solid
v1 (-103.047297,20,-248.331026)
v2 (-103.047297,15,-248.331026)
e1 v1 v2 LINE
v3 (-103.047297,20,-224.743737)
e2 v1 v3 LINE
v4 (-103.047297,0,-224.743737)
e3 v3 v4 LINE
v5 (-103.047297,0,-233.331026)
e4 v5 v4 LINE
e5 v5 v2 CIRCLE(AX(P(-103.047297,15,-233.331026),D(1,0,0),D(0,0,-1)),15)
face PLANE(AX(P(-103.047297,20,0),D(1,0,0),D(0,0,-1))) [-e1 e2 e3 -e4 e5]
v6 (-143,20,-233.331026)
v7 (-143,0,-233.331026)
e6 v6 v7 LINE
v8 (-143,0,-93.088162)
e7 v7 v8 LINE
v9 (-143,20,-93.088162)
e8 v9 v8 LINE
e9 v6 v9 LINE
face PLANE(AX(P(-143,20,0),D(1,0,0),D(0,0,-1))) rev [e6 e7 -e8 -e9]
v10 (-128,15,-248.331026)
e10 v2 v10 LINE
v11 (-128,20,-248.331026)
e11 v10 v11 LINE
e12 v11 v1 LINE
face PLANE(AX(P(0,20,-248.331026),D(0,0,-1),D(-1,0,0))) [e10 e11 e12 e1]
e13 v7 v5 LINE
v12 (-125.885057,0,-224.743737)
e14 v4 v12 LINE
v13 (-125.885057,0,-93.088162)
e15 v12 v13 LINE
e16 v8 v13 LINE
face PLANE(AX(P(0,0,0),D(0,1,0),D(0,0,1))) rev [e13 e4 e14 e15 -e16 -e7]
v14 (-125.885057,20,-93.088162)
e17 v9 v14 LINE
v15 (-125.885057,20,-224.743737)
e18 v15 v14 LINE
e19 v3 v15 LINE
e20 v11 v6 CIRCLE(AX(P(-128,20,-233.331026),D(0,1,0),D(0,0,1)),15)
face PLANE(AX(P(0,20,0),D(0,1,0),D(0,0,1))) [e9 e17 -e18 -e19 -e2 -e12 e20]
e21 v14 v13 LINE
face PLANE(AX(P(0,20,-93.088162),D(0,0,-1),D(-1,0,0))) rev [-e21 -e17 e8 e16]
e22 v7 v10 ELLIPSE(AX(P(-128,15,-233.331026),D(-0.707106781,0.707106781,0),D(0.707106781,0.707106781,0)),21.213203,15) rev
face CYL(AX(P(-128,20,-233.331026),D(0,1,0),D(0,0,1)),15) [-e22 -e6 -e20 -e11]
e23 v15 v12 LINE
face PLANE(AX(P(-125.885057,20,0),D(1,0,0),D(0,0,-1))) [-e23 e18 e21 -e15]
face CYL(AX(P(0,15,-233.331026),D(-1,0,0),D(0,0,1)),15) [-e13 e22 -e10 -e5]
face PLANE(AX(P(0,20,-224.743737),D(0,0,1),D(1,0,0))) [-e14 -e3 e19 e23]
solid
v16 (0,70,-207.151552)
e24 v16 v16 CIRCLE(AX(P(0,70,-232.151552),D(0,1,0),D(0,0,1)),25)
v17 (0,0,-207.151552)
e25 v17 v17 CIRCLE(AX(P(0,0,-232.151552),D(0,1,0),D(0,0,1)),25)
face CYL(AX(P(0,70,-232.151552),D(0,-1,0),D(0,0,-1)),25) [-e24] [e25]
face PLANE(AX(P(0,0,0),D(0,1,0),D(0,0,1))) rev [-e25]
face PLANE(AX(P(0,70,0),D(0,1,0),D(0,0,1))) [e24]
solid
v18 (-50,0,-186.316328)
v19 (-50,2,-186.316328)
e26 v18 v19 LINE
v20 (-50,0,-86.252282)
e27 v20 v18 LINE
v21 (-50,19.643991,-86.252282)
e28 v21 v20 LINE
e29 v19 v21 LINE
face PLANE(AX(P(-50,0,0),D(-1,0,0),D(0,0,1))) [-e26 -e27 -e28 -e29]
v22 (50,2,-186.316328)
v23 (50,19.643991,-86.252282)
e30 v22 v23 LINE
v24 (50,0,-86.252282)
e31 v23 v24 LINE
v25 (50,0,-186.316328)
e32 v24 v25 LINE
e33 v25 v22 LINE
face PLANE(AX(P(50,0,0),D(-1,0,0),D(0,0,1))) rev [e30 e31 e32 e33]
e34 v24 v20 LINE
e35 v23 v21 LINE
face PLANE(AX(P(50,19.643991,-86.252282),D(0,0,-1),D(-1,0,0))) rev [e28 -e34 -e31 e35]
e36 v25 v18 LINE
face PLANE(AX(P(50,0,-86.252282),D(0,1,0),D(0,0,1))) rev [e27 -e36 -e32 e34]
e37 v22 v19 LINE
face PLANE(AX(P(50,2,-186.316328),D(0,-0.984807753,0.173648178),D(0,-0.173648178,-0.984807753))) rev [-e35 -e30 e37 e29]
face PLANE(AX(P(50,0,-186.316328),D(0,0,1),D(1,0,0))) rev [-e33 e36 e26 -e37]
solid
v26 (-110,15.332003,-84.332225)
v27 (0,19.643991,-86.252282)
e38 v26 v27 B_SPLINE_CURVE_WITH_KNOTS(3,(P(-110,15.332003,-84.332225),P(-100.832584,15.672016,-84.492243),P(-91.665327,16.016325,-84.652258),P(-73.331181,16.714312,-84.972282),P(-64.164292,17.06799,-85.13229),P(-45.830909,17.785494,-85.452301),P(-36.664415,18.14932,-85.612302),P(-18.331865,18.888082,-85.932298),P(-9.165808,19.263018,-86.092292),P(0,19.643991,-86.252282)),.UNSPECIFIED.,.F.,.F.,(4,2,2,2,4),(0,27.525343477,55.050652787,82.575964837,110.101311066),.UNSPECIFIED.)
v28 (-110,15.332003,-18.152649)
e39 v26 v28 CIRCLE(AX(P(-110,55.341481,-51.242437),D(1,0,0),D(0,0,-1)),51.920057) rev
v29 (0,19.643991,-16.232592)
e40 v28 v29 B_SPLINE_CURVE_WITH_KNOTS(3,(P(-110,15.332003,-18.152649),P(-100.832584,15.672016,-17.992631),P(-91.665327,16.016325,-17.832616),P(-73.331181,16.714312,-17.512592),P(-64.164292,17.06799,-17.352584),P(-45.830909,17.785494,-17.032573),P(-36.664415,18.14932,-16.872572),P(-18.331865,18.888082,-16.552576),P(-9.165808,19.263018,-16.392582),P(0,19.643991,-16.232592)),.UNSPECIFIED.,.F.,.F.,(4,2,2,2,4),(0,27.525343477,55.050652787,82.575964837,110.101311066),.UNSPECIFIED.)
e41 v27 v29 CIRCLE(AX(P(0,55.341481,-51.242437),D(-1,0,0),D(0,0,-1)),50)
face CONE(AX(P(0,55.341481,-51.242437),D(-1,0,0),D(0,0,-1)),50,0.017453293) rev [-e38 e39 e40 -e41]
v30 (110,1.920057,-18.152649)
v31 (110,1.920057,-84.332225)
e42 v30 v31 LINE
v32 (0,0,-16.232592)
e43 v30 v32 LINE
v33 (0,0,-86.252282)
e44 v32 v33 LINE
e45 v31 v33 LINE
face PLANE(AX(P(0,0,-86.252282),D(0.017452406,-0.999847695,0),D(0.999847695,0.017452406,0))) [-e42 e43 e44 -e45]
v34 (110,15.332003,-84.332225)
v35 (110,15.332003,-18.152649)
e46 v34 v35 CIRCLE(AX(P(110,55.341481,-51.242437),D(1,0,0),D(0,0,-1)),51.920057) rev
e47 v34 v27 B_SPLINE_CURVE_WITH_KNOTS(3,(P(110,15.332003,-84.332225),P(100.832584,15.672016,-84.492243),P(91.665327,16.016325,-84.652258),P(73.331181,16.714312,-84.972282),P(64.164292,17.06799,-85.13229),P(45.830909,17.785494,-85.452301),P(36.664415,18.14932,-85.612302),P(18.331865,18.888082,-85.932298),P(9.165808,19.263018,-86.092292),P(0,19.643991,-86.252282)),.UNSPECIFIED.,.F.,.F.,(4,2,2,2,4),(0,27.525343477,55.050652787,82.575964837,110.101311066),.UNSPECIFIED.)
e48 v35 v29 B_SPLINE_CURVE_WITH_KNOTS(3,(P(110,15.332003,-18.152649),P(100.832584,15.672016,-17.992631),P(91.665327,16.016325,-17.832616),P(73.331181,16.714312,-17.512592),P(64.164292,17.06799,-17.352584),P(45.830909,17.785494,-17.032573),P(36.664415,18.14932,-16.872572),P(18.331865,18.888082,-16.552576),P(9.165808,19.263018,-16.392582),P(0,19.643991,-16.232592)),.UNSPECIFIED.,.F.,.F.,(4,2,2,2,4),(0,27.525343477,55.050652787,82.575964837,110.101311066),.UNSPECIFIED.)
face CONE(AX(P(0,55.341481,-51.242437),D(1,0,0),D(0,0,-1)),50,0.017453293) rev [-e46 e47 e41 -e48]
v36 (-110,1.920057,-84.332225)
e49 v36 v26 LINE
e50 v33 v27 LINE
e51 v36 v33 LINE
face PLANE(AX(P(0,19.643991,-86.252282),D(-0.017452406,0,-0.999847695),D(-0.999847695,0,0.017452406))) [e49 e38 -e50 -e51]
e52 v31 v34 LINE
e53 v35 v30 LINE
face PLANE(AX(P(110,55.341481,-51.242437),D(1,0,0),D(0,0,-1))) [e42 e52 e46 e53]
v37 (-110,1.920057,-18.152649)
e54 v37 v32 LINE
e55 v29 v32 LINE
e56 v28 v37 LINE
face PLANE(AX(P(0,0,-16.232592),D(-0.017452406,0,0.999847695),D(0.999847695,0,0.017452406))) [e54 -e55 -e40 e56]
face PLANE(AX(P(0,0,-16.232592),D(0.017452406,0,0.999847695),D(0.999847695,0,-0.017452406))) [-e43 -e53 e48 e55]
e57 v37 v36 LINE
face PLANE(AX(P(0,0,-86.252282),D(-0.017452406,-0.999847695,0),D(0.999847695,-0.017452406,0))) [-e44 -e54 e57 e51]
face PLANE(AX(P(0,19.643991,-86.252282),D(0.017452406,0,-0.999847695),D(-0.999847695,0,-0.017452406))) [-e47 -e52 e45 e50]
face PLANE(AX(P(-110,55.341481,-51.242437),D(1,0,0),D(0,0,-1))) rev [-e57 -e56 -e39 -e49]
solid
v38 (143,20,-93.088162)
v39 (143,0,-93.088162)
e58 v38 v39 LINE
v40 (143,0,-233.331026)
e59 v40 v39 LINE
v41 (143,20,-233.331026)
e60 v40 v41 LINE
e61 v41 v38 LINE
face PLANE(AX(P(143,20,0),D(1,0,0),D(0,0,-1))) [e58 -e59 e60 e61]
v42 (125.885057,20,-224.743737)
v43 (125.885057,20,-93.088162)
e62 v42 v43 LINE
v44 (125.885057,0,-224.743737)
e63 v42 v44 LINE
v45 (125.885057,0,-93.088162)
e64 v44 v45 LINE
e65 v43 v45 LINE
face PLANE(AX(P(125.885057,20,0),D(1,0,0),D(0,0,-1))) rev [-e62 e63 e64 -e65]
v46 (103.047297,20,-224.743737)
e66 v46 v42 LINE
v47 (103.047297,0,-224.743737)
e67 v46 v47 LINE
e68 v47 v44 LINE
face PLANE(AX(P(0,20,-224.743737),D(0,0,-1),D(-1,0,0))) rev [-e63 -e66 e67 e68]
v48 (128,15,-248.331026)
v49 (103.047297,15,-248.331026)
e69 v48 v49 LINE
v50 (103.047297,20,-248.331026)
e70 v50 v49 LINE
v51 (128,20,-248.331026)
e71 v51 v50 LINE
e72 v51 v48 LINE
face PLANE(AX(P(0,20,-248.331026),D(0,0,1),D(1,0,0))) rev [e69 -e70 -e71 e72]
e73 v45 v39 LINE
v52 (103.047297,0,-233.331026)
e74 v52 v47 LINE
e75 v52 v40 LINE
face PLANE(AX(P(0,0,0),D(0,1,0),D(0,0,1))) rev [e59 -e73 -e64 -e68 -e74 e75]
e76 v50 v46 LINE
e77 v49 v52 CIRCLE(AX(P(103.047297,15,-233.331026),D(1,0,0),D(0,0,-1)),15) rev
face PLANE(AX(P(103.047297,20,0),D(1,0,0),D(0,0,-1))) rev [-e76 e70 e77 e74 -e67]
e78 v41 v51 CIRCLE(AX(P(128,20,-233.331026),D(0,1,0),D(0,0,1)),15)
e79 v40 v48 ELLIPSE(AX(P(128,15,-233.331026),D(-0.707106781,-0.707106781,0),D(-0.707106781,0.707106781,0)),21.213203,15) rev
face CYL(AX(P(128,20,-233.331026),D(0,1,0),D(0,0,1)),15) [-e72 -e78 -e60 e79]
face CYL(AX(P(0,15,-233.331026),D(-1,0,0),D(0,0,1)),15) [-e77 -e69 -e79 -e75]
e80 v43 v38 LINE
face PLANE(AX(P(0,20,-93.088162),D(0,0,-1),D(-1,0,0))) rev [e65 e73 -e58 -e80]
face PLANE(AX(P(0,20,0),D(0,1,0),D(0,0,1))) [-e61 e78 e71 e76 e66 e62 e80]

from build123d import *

# Parameters (mm, degrees)
BOSS_EXTRUDE1_DEPTH           = 20
BOSS_EXTRUDE1_2_DEPTH         = 20
FILLET1_R                     = 15
FILLET2_R                     = 15
BOSS_EXTRUDE2_DEPTH           = 50
SKETCH4_R                     = 25
BOSS_EXTRUDE3_DEPTH           = 70
BOSS_EXTRUDE4_DEPTH           = 110
BOSS_EXTRUDE4_DRAFT           = 1
BOSS_EXTRUDE4_OTHER_WAY_DEPTH = 110
BOSS_EXTRUDE4_OTHER_WAY_DRAFT = -1


with BuildPart() as part:
    # Sketch3 → Boss-Extrude1 (new body)
    with BuildSketch(Plane(origin=(0, 0, 0), x_dir=(1, 0, 0), z_dir=(0, 1, 0))):
        Polygon((-143, 248.331026124), (-143, 93.088162206), (-125.885057368, 93.088162206), (-125.885057368, 224.743736792), (-103.047296996, 224.743736792), (-103.047296996, 248.331026124), align=None)
    extrude(amount=BOSS_EXTRUDE1_DEPTH)

    # Fillet1
    fillet1_edges = [part.edges().sort_by_distance(p)[0] for p in [
        (-143, 10, -248.331026124),
        (-123.023648498, 0, -248.331026124),
    ]]
    fillet(fillet1_edges, radius=FILLET1_R)


with BuildPart() as body_2:
    # Sketch3 → Boss-Extrude1 2 (new body)
    with BuildSketch(Plane(origin=(0, 0, 0), x_dir=(1, 0, 0), z_dir=(0, 1, 0))):
        Polygon((125.885057368, 224.743736792), (125.885057368, 93.088162206), (143, 93.088162206), (143, 248.331026124), (103.047296996, 248.331026124), (103.047296996, 224.743736792), align=None)
    extrude(amount=BOSS_EXTRUDE1_2_DEPTH)

    # Fillet2
    fillet2_edges = [body_2.edges().sort_by_distance(p)[0] for p in [
        (143, 10, -248.331026124),
        (123.023648498, 0, -248.331026124),
    ]]
    fillet(fillet2_edges, radius=FILLET2_R)


with BuildPart() as body_3:
    # Sketch5 → Boss-Extrude2 (new, symmetric)
    with BuildSketch(Plane(origin=(0, 0, 0), x_dir=(0, 0, -1), z_dir=(1, 0, 0))):
        Polygon((86.252282078, 19.643991172), (86.252282078, 0), (186.316328437, 0), (186.316328437, 2), align=None)
    extrude(amount=BOSS_EXTRUDE2_DEPTH, both=True)


with BuildPart() as body_4:
    # Sketch4 → Boss-Extrude3 (new body)
    with BuildSketch(Plane(origin=(0, 0, 0), x_dir=(1, 0, 0), z_dir=(0, 1, 0))):
        with Locations(Location((0, 232.151552464, 0), (0, 0, 270))):
            Circle(SKETCH4_R)
    extrude(amount=BOSS_EXTRUDE3_DEPTH)


with BuildPart() as boss_extrude4_tool:
    # Sketch6 → Boss-Extrude4 (with draft: the straight prism first)
    with BuildSketch(Plane(origin=(0, 0, 0), x_dir=(0, 0, -1), z_dir=(1, 0, 0))):
        with BuildLine():
            Line((86.252282078, 0), (86.252282078, 19.643991172))
            ThreePointArc((86.252282078, 19.643991172), (51.24243699, 5.341480536), (16.232591902, 19.643991172))
            Line((16.232591902, 19.643991172), (16.232591902, 0))
            Line((16.232591902, 0), (86.252282078, 0))
        make_face()
    extrude(amount=BOSS_EXTRUDE4_DEPTH)
    # Boss-Extrude4: the draft: its side faces are tilted about the plane it starts from
    boss_extrude4_sides = [boss_extrude4_tool.faces().sort_by_distance(p)[0] for p in [
        (55, 9.821995586, -86.252282078),
        (55, 5.341480536, -51.24243699),
        (55, 9.821995586, -16.232591902),
        (55, 0, -51.24243699),
    ]]
    draft(boss_extrude4_sides, Plane(origin=(0, 0, 0), x_dir=(0, 0, -1), z_dir=(1, 0, 0)), BOSS_EXTRUDE4_DRAFT)


with BuildPart() as body_3_1:
    add(body_3.part)

    # Boss-Extrude4: add boss_extrude4_tool
    add(boss_extrude4_tool.part)


with BuildPart() as boss_extrude4_other_way_tool:
    # Sketch6 → Boss-Extrude4 other way (with draft: the straight prism first)
    with BuildSketch(Plane(origin=(0, 0, 0), x_dir=(0, 0, -1), z_dir=(1, 0, 0))):
        with BuildLine():
            Line((86.252282078, 0), (86.252282078, 19.643991172))
            ThreePointArc((86.252282078, 19.643991172), (51.24243699, 5.341480536), (16.232591902, 19.643991172))
            Line((16.232591902, 19.643991172), (16.232591902, 0))
            Line((16.232591902, 0), (86.252282078, 0))
        make_face()
    extrude(amount=-BOSS_EXTRUDE4_OTHER_WAY_DEPTH)
    # Boss-Extrude4 other way: the draft: its side faces are tilted about the plane it starts from
    boss_extrude4_other_way_sides = [boss_extrude4_other_way_tool.faces().sort_by_distance(p)[0] for p in [
        (-55, 9.821995586, -86.252282078),
        (-55, 5.341480536, -51.24243699),
        (-55, 9.821995586, -16.232591902),
        (-55, 0, -51.24243699),
    ]]
    draft(boss_extrude4_other_way_sides, Plane(origin=(0, 0, 0), x_dir=(0, 0, -1), z_dir=(1, 0, 0)), BOSS_EXTRUDE4_OTHER_WAY_DRAFT)


with BuildPart() as body_3_2:
    add(body_3_1.part)

    # Boss-Extrude4 other way: add boss_extrude4_other_way_tool
    add(boss_extrude4_other_way_tool.part)


solid = Compound([part.part, body_2.part, body_4.part, body_3_2.part])
